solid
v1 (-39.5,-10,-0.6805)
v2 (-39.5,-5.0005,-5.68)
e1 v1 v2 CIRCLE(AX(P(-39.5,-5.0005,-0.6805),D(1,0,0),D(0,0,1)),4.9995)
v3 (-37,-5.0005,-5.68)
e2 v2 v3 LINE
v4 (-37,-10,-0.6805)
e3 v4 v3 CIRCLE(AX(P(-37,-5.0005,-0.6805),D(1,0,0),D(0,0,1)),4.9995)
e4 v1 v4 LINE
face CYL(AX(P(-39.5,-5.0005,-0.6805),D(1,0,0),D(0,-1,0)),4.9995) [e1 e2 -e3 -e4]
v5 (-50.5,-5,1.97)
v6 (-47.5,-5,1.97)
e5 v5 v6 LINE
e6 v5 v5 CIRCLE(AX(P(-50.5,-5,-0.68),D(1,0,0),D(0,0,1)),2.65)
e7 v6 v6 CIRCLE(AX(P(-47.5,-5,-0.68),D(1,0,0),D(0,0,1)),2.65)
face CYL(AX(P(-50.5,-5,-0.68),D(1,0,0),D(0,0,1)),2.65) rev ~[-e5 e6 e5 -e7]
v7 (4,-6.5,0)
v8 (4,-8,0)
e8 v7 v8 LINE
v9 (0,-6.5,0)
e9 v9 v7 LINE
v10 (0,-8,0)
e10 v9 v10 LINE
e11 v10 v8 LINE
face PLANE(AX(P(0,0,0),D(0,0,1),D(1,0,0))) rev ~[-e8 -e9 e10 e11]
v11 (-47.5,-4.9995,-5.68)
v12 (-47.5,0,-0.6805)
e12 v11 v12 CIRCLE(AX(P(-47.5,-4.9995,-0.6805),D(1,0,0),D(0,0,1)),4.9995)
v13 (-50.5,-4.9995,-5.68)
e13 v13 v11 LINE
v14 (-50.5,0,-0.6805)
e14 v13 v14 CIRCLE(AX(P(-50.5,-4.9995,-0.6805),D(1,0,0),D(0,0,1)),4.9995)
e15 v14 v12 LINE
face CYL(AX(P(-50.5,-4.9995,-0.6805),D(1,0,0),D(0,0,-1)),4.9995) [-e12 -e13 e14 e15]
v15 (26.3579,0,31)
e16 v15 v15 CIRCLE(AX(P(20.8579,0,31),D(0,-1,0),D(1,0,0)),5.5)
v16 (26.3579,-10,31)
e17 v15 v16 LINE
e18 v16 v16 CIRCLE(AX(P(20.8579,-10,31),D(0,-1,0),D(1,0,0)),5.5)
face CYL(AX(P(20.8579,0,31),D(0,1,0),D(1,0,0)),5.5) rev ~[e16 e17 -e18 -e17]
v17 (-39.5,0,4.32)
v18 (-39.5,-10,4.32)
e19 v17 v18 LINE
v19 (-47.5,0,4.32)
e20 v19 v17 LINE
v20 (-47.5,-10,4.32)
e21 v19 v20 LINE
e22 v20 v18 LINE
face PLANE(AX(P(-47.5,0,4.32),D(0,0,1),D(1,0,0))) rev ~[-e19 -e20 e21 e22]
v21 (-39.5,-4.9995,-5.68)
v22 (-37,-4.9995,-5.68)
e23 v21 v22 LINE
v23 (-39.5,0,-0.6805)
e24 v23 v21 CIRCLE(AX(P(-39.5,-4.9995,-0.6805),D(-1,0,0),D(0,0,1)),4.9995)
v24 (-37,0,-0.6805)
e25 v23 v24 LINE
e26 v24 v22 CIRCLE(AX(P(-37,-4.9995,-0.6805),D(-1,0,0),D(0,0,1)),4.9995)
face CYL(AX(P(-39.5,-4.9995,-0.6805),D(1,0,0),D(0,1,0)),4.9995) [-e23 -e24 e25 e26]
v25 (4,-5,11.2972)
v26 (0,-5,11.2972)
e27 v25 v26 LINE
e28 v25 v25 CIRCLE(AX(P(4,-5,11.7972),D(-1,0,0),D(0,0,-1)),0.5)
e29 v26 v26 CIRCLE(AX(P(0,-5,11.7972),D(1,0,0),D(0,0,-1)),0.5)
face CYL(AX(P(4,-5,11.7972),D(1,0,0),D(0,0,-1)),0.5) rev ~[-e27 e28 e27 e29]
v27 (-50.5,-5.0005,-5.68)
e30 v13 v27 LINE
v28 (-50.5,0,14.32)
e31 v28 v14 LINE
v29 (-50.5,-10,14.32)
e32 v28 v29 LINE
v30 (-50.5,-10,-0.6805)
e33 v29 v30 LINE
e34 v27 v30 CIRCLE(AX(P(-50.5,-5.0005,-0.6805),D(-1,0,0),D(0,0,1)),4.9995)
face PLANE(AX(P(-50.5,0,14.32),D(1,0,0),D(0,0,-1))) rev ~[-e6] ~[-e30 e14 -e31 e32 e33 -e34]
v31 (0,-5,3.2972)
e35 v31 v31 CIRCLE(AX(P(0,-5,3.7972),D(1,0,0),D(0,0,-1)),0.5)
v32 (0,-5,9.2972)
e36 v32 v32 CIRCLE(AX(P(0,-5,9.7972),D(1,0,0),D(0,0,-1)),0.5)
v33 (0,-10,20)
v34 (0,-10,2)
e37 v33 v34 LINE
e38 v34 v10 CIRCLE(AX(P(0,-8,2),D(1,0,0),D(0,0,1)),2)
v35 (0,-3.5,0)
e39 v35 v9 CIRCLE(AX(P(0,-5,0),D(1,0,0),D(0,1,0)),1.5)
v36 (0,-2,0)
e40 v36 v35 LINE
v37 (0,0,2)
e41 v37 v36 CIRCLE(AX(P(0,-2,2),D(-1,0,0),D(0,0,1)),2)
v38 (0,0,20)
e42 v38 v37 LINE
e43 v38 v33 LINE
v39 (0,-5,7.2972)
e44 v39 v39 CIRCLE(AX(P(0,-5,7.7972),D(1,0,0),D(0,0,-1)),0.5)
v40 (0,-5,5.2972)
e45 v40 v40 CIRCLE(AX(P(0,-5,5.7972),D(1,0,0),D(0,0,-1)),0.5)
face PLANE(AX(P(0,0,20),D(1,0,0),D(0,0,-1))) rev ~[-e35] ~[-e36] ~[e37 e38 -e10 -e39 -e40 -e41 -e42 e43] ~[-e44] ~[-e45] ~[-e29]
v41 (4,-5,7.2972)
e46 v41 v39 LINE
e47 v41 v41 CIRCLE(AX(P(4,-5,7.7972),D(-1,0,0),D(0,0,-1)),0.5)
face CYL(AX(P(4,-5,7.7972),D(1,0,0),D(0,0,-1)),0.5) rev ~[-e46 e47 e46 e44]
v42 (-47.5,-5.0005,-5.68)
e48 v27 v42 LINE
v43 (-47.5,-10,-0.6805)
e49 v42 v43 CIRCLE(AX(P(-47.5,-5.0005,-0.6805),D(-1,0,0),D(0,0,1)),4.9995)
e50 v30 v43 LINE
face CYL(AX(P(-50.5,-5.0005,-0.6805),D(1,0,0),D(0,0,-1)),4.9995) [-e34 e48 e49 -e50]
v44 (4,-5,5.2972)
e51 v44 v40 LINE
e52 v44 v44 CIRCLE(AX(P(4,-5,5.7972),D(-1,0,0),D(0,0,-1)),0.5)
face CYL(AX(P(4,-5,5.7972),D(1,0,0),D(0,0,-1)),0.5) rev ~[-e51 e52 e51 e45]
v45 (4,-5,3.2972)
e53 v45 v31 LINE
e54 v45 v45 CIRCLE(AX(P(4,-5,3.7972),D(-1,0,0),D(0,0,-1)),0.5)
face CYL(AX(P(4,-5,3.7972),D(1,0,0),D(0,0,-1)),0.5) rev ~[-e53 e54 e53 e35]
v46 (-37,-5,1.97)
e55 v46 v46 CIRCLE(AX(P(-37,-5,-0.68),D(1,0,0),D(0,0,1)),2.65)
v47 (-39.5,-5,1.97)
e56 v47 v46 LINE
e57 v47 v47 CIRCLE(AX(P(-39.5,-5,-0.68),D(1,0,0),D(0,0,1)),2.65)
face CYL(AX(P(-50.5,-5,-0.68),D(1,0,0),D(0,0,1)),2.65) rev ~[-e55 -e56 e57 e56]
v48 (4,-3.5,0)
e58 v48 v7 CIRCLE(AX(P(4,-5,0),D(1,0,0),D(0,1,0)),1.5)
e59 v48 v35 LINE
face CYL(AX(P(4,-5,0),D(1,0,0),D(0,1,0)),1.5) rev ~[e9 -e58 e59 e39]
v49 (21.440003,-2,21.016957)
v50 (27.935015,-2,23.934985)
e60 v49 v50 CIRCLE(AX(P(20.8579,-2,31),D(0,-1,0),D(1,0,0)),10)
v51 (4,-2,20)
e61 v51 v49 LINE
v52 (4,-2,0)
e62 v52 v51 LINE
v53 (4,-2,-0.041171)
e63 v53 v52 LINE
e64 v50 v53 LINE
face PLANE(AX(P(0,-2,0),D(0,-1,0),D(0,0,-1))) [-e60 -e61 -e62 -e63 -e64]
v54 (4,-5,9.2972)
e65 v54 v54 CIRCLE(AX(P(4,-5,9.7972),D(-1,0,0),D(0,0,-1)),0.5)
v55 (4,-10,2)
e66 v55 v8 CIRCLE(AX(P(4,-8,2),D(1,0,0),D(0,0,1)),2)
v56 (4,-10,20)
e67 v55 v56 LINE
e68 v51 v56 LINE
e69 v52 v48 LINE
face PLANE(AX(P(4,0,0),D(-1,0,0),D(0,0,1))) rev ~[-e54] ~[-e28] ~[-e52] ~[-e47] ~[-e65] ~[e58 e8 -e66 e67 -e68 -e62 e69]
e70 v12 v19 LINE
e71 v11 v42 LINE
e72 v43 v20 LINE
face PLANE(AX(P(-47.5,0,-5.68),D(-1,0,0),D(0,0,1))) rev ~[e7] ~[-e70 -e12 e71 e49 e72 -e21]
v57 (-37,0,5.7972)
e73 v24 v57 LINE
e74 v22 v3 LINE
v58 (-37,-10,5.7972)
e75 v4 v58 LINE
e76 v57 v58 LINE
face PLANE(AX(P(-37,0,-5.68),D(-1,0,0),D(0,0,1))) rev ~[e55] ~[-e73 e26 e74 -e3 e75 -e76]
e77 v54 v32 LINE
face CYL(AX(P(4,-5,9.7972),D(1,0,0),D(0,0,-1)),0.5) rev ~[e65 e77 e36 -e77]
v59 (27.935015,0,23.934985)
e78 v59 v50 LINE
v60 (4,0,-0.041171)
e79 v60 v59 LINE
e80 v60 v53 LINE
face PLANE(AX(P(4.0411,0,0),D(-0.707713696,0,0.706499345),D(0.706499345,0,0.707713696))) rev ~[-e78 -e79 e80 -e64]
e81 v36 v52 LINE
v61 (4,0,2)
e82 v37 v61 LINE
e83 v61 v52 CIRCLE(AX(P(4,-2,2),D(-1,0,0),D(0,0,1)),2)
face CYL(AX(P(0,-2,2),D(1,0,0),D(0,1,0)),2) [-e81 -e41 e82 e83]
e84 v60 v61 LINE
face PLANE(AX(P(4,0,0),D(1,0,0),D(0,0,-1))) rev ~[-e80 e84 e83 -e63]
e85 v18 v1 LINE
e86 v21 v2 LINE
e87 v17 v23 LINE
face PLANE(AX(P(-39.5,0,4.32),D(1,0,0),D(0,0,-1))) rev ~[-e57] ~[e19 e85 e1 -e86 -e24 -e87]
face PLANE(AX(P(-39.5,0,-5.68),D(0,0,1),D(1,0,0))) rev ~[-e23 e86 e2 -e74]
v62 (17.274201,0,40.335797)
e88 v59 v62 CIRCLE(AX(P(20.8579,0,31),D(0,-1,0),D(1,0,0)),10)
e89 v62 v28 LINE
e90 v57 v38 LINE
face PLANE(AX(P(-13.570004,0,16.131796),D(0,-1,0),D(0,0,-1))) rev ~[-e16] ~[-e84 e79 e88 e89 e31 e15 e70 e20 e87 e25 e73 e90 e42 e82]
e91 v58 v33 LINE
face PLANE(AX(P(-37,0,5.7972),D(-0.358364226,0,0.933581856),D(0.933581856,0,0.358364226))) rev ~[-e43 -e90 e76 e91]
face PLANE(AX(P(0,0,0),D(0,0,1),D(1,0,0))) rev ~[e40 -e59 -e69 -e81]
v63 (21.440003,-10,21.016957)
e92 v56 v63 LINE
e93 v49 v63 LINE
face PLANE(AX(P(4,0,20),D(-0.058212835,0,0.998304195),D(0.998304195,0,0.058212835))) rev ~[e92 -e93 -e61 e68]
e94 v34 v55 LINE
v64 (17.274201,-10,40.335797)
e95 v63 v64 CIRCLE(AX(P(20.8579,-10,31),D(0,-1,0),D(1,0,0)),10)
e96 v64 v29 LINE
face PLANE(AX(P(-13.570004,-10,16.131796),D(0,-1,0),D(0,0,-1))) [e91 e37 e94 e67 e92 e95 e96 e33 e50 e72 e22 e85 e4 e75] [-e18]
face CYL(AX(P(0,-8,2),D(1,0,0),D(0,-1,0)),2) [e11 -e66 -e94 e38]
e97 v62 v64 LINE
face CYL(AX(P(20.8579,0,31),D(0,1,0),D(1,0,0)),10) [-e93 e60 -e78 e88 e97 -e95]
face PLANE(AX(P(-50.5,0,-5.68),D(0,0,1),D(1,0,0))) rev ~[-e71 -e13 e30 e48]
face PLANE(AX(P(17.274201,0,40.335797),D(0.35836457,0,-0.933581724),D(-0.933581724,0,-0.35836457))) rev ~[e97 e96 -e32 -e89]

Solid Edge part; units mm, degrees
sketch "Sketch1" plane through (0, 0, 0) normal (0, -1, 0) x (1, 0, 0)
  line L0 (-50.5, 14.32) -> (-50.5, -5.68)
  line L1 (-50.5, -5.68) -> (-47.5, -5.68)
  line L2 (-47.5, -5.68) -> (-47.5, 4.32)
  line L3 (-47.5, 4.32) -> (-39.5, 4.32)
  line L4 (-39.5, 4.32) -> (-39.5, -5.68)
  line L5 (-39.5, -5.68) -> (-37, -5.68)
  line L6 (-37, -5.68) -> (-37, 5.7972)
  line L7 (-37, 5.7972) -> (0, 20)
  line L8 (0, 20) -> (0, 0)
  line L9 (0, 0) -> (4, 0)
  line L10 (4, 0) -> (4, 20)
  line L11 (4, 20) -> (21.44, 21.017)
  arc A0 (21.44, 21.017) -> (17.2742, 40.3358) centre (20.8579, 31) ccw
  line L12 (17.2742, 40.3358) -> (-50.5, 14.32)
  circle A1 centre (20.8579, 31) radius 5.5
  dimension "D1" = 3
  dimension "D2" = 2.5
  dimension "D3" = 8
  dimension "D4" = 20
  dimension "D5" = 4
  dimension "D6" = 20
  dimension "D7" = 37
  dimension "D8" = 31
  dimension "D9" = 5.68
  dimension "D10" = 71.3579
  dimension "D11" = 10
  dimension "D12" = 11.4772
  dimension "D13" = 72.5959
  dimension "D14" = 10
extrude "Protrusion1" add sketch "Sketch1" along normal blind 10
sketch "Sketch2" plane through (0, 0, 0) normal (0, -1, 0) x (1, 0, 0)
  line L0 (4, 20) -> (4, 0)
  line L1 (4, 20) -> (21.44, 21.017)
  line L2 (4.0411, 0) -> (27.935, 23.935)
  arc A0 (21.44, 21.017) -> (27.935, 23.935) centre (20.8579, 31) ccw
extrude "ProtrusiónExtruida_2" add sketch "Sketch2" along normal blind 2 material side at (4.05, 0, 10)
fillet "Redondeo_1" radius 5 4 edges at (-49, -10, -5.68) (-38.25, -10, -5.68) (-38.25, 0, -5.68) (-49, 0, -5.68)
fillet "Redondeo_2" radius 2 2 edges at (2, -10, 0) (2, 0, 0)
hole "Agujero_1" at (-50.5, -5, -0.68) direction (1, 0, 0) diameter 5.3 depth 31.9512
sketch "Sketch3" plane through (4, -6, 10) normal (1, 0, 0) x (0, 1, 0)
  circle A0 centre (1, -10) radius 1.5
extrude "Cutout1" cut sketch "Sketch3" against normal up to next
hole "Agujero_3" at (4, -5, 7.7972) direction (-1, 0, 0) diameter 1 end up to next
hole "Hole1" at (4, -5, 9.7972) direction (-1, 0, 0) diameter 1 end up to next
hole "Hole2" at (4, -5, 11.7972) direction (-1, 0, 0) diameter 1 end up to next
hole "Hole3" at (4, -5, 5.7972) direction (-1, 0, 0) diameter 1 end up to next
hole "Hole4" at (4, -5, 3.7972) direction (-1, 0, 0) diameter 1 end up to next
